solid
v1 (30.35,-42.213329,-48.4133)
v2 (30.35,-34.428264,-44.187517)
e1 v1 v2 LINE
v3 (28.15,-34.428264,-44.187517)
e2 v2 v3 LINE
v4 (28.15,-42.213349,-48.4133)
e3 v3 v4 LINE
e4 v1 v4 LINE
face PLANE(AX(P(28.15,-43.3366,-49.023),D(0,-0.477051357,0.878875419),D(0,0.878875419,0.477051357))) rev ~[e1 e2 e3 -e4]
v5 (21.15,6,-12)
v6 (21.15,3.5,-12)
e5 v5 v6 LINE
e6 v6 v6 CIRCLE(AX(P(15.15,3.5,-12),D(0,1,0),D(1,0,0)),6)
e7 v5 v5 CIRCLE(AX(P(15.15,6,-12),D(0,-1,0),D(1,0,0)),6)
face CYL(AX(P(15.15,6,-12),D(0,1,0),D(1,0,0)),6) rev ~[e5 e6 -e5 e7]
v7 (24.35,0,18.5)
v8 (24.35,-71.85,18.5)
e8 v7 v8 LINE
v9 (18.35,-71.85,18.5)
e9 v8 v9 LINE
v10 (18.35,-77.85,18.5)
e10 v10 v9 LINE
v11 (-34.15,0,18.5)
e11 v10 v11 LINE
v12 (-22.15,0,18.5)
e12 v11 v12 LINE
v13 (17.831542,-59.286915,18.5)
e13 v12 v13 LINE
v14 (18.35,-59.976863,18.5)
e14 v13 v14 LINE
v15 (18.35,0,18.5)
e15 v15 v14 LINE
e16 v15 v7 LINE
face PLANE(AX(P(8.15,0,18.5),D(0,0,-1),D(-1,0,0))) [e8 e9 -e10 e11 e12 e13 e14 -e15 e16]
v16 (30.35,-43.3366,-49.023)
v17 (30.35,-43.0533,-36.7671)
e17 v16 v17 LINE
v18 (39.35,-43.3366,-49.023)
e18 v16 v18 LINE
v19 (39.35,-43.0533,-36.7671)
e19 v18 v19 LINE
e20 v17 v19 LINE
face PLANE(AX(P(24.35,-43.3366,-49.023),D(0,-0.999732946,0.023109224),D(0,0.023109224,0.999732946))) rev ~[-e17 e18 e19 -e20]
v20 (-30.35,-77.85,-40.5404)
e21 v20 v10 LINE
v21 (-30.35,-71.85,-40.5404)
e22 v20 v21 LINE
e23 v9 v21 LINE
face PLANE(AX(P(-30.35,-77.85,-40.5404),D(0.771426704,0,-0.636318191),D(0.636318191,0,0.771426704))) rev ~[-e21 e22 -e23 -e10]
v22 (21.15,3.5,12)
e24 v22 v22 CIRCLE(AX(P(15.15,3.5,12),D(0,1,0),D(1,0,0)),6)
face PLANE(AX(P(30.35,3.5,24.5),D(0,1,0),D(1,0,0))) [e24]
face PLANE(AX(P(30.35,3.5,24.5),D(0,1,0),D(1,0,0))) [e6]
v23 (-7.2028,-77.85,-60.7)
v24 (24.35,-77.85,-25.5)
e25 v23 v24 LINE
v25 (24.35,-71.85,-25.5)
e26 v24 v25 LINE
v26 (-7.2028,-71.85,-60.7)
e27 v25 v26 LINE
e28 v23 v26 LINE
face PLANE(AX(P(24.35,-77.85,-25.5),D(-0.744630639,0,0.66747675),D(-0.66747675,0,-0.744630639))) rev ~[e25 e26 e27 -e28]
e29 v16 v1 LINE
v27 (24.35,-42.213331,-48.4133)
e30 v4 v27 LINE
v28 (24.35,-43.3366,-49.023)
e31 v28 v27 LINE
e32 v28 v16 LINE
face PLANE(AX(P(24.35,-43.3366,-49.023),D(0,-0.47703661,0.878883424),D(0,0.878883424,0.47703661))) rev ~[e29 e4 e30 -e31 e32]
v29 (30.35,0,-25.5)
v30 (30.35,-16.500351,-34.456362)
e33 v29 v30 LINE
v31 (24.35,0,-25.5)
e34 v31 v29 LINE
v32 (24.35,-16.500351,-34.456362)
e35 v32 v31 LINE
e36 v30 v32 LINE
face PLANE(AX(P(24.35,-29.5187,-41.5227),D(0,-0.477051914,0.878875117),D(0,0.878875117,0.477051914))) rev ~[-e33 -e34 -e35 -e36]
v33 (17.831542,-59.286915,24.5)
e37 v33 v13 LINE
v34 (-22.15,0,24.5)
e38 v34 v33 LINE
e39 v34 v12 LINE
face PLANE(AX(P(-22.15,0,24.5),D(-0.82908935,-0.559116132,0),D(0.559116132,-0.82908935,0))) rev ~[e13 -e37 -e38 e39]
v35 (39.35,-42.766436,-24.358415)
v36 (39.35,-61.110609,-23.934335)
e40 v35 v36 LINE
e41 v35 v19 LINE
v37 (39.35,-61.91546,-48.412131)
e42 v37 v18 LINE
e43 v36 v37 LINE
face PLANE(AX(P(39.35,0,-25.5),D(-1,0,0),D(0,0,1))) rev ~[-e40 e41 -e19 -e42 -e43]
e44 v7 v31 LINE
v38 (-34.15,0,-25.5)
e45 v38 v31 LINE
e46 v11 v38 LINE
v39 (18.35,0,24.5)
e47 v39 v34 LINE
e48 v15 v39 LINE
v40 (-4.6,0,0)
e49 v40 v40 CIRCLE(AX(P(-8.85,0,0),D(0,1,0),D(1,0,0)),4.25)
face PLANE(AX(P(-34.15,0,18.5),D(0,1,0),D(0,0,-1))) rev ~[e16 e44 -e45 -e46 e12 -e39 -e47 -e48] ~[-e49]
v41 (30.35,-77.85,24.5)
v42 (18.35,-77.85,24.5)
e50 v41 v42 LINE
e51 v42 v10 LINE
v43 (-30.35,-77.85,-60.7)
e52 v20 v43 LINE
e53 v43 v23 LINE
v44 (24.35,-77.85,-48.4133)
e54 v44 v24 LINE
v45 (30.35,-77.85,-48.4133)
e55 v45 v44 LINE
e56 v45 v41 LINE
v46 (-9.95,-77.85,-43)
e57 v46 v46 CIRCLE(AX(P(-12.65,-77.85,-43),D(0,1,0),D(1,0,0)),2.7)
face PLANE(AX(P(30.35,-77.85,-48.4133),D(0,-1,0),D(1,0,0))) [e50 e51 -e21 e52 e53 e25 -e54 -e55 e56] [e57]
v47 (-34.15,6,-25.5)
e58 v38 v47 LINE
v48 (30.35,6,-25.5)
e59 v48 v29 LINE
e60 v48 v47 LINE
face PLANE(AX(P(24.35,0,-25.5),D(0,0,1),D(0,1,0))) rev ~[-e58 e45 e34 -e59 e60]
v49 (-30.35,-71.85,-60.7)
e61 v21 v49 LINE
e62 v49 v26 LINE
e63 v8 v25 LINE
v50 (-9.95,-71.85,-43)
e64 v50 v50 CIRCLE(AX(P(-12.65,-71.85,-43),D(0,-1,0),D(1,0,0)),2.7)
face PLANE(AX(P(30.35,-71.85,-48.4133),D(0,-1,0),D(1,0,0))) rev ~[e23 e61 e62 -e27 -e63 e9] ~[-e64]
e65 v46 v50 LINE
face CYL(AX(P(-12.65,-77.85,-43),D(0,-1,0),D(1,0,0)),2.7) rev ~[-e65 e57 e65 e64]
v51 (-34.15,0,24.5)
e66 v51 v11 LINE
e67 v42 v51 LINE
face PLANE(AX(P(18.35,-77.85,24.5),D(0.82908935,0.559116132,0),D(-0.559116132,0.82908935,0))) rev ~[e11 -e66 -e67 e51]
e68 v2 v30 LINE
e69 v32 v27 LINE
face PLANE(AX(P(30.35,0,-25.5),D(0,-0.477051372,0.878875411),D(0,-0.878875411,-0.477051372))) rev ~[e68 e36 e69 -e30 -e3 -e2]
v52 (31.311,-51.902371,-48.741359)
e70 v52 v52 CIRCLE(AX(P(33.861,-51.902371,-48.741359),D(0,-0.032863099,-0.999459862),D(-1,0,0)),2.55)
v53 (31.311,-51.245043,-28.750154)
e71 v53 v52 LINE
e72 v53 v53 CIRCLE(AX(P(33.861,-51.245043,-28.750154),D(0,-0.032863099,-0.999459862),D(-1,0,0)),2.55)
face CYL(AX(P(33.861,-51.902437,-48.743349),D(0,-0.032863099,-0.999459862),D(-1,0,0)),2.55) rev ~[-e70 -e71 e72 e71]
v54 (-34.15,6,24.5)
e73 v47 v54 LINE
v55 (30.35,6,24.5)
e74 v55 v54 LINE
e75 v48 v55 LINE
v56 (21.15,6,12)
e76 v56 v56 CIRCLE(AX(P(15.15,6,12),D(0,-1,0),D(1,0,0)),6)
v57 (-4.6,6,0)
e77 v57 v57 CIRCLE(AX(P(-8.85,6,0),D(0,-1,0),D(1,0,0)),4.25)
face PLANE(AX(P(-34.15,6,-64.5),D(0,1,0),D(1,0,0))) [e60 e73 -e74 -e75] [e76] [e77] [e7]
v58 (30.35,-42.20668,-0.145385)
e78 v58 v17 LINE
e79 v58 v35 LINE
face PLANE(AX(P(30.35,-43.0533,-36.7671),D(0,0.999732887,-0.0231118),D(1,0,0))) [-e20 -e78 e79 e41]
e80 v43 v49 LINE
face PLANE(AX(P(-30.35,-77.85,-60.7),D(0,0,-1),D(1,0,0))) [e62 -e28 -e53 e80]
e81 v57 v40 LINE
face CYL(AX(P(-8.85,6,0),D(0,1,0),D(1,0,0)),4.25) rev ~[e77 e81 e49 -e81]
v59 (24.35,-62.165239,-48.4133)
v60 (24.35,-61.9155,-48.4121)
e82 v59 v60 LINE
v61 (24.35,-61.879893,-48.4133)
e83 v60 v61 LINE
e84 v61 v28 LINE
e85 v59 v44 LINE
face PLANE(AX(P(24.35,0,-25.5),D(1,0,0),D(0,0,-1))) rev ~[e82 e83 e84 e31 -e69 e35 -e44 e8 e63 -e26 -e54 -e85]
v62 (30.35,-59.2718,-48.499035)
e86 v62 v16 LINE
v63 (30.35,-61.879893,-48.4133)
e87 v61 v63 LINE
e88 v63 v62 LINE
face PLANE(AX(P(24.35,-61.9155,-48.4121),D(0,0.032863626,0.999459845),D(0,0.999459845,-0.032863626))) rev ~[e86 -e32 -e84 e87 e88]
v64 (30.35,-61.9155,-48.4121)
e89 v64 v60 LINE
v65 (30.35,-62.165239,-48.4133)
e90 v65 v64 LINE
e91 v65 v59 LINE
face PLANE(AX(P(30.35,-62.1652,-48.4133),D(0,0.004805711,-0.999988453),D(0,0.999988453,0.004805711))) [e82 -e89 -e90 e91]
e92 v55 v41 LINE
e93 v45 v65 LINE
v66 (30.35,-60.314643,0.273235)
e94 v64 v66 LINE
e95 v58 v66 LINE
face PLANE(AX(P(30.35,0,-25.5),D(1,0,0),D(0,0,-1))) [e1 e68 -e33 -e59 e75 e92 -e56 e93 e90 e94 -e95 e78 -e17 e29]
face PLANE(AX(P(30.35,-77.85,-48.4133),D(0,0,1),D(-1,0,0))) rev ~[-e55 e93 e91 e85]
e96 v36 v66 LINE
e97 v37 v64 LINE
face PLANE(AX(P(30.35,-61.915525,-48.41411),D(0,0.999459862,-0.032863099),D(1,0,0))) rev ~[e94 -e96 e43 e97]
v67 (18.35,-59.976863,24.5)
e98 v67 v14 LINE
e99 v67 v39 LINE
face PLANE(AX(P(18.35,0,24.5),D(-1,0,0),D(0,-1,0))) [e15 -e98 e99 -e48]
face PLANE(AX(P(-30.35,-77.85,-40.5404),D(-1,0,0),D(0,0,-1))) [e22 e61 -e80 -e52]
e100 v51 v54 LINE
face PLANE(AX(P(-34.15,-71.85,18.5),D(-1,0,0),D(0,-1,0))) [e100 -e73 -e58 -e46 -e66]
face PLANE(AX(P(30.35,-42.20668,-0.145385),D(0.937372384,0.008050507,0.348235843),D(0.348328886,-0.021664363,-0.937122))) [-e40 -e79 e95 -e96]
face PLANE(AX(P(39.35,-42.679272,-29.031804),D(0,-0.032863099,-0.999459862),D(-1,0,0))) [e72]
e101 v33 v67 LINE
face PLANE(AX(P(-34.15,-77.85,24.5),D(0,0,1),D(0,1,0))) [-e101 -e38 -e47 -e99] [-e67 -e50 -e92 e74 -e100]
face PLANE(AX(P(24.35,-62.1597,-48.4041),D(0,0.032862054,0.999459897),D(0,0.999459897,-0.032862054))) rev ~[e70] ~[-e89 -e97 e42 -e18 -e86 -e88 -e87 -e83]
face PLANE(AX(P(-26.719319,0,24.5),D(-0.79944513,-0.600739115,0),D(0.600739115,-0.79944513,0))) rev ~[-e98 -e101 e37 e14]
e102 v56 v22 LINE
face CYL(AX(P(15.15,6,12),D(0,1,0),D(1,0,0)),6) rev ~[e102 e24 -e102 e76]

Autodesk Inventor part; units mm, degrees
ref_plane "YZ Plane" through (0, 0, 0) normal (1, 0, 0) x (0, 1, 0)
ref_plane "XZ Plane" through (0, 0, 0) normal (0, 1, 0) x (-1, 0, 0)
ref_plane "XY Plane" through (0, 0, 0) normal (0, 0, 1) x (1, 0, 0)
sketch "Sketch1" plane through (0, 0, 0) normal (0, 1, 0) x (-1, 0, 0)
  line L0 (0, -25.5) -> (-34.15, -25.5)
  line L1 (-34.15, -25.5) -> (-34.15, 0)
  line L2 (-34.15, 0) -> (-34.15, 25.5)
  line L3 (-34.15, 25.5) -> (0, 25.5)
  line L4 (0, 25.5) -> (34.15, 25.5)
  line L5 (34.15, 25.5) -> (34.15, 0)
  line L6 (34.15, 0) -> (34.15, -25.5)
  line L7 (34.15, -25.5) -> (0, -25.5)
  point P0 (0, 0)
extrude "Extrusion1" add sketch "Sketch1" along normal blind 7
sketch "Sketch3" plane through (-34.15, 0, 25.5) normal (0, 0, 1) x (1, 0, 0)
  line L0 (0, 0) -> (0, -78.85)
  point P0 (34.15, 0)
  dimension "d7" = 78.85
sketch "Sketch4" plane through (-34.15, 0, -25.5) normal (-1, 0, 0) x (0, 0, 1)
  line L0 (51, 0) -> (51, -78.85)
  line L1 (51, -78.85) -> (-39, -78.85)
  line L2 (-39, -78.85) -> (-39, -71.85)
  line L3 (0, 0) -> (-39, -71.85)
  line L4 (0, 0) -> (51, 0)
  point P0 (25.5, 0)
  dimension "d10" = 90
  dimension "d11" = 7
extrude "Extrusion2" add sketch "Sketch4" against normal blind 7
sketch "Sketch7" plane through (-27.15, 0, -25.5) normal (1, 0, 0) x (0, 0, -1)
  line L0 (-51, -78.85) -> (39, -78.85) projected
  line L1 (-51, -78.85) -> (39, -78.85)
  line L2 (39, -78.85) -> (39, -71.85) projected
  line L3 (39, -78.85) -> (39, -71.85)
  line L4 (39, -71.85) -> (-51, -71.85)
  line L5 (-51, 0) -> (-51, -78.85) projected
  line L6 (-51, -78.85) -> (-51, -71.85)
  point P0 (-25.5, 0)
sketch "Sketch8" plane through (0, 0, 0) normal (0, -1, 0) x (1, 0, 0)
  circle A0 centre (8.15, 0) radius 5 projected
  line L0 (8.15, 18.5) -> (34.15, 18.5)
  line L1 (34.15, 25.5) -> (34.15, -25.5) projected
  line L2 (8.15, 25.5) -> (34.15, 25.5)
  line L3 (8.15, 25.5) -> (-27.15, 25.5)
  line L4 (-27.15, 25.5) -> (-27.15, -25.5) projected
  line L5 (8.15, 18.5) -> (-27.15, 18.5)
  line L6 (34.15, 25.5) -> (34.15, 18.5)
  line L7 (-27.15, 25.5) -> (-27.15, 18.5)
  point P0 (0, 0)
extrude "Extrusion6" add sketch "Sketch7" along normal blind 58.5
extrude "Extrusion7" add sketch "Sketch8" along normal blind 78.75 contours L5 L4 L3 L2 L1 L0
sketch "Sketch9" plane through (31.35, 0, -25.5) normal (1, 0, 0) x (0, 0, -1)
  line L0 (-51, -78.75) -> (-51, 7) projected
  line L1 (-44, 0) -> (-44, -71.85) projected
  line L2 (-51, -78.75) -> (-44, -78.75)
  line L3 (-44, -78.75) -> (-44, -71.85)
  line L4 (-44, -71.85) -> (-51, -71.85)
  line L5 (-51, -71.85) -> (-51, -78.75)
  point P0 (-25.5, 0)
extrude "Extrusion8" cut sketch "Sketch9" along normal blind 10
sketch "Sketch10" plane through (0, 7, 0) normal (0, 1, 0) x (1, 0, 0)
  point P0 (0, 0)
sketch "Boceto11" plane through (-34.15, -78.85, -64.5) normal (0, -1, 0) x (1, 0, 0)
  line L0 (0, 0) -> (65.5, 0) projected
  line L1 (65.5, 89.9985) -> (65.5, 0)
  line L2 (65.5, 0) -> (71.065, 0)
  line L3 (71.065, 0) -> (71.065, 89.9985)
  line L4 (71.065, 89.9985) -> (65.5, 89.9985)
  line L5 (65.5, 89.9985) -> (65.5, 95.8996)
  line L6 (65.5, 95.8996) -> (71.065, 89.9985)
  point P0 (34.15, 64.5)
extrude "Extrusión9" cut sketch "Boceto11" against normal blind 100
sketch "Boceto12" plane through (31.35, 0, -25.5) normal (1, 0, 0) x (0, 0, -1)
  line L0 (-44, 0) -> (-44, -71.85) projected
  line L1 (-44, 0) -> (-44, -71.85)
  line L2 (39, -71.85) -> (39, -78.85) projected
  line L3 (-44, -71.85) -> (39, -71.85)
  line L4 (-44, 0) -> (0, 0) projected
  line L5 (39, -71.85) -> (0, 0)
  line L6 (0, 0) -> (-44, 0)
  point P0 (-25.5, 0)
extrude "Extrusión10" add sketch "Boceto12" against normal blind 7
sketch "Boceto13" plane through (-34.15, 7, -25.5) normal (-1, 0, 0) x (0, 0, 1)
  line L0 (0, -7) -> (0, 0) projected
  line L1 (44, -7) -> (0, -7) projected
  line L2 (0, -7) -> (44, -7)
  line L3 (44, -78.85) -> (-39, -78.85) projected
  line L4 (44, -7) -> (44, -78.85)
  line L5 (44, -78.85) -> (-39, -78.85)
  line L6 (-39, -78.85) -> (0, -7)
  point P0 (25.5, -7)
extrude "Extrusión11" cut sketch "Boceto13" against normal blind 7
sketch "Boceto15" plane through (-34.15, 0, -25.5) normal (0, 0, -1) x (-1, 0, 0)
  point P0 (-34.15, 0)
sketch "Boceto19" plane through (-34.15, -78.85, -64.5) normal (0, -1, 0) x (1, 0, 0)
  line L0 (65.5, 90) -> (65.5, 0) projected
  line L1 (65.5, 0) -> (65.5, 40.9323)
  line L2 (81.7334, 40.9323) -> (65.5, 40.9323)
  line L3 (81.7334, 40.9323) -> (81.7334, 0)
  line L4 (81.7334, 0) -> (65.5, 0)
  point P0 (34.15, 64.5)
extrude "Extrusión17" cut sketch "Boceto19" against normal blind 100
sketch "Boceto20" plane through (24.35, 0, -25.5) normal (-1, 0, 0) x (0, 0, 1)
  line L0 (-29.1839, -53.7657) -> (-27.9516, -53.3206) projected
  line L1 (0, 0) -> (-39, -71.85) projected
  line L2 (-29.1839, -53.7657) -> (-27.8697, -51.3447)
  line L3 (-27.8697, -51.3447) -> (-27.9516, -53.3206) projected
  line L4 (-27.8697, -51.3447) -> (-27.9516, -53.3206)
  line L5 (-27.9516, -53.3206) -> (-29.1839, -53.7657)
  point P0 (25.5, 0)
extrude "Extrusión18" add sketch "Boceto20" against normal blind 7
sketch "Boceto21" plane through (24.35, 0, -25.5) normal (-1, 0, 0) x (0, 0, 1)
  point P0 (25.5, 0)
sketch "Boceto22" plane through (24.35, 0, -25.5) normal (-1, 0, 0) x (0, 0, 1)
  point P0 (25.5, 0)
sketch "Boceto24" plane through (31.35, 0, -25.5) normal (1, 0, 0) x (0, 0, -1)
  point P0 (-25.5, 0)
sketch "Boceto26" plane through (24.35, 0, -25.5) normal (-1, 0, 0) x (0, 0, 1)
  point P0 (25.5, 0)
sketch "Boceto27" plane through (31.35, 0, -25.5) normal (1, 0, 0) x (0, 0, -1)
  line L0 (-51, 7) -> (0, 7) projected
  line L1 (0, 7) -> (16.0227, 7)
  line L2 (16.0227, 7) -> (16.0227, -29.5187)
  line L3 (0, 0) -> (39, -71.85) projected
  line L4 (16.0227, -29.5187) -> (0, 0)
  line L5 (0, 0) -> (0, 7)
  point P0 (-25.5, 0)
extrude "Extrusión22" add sketch "Boceto27" against normal blind 7
sketch "Boceto28" plane through (24.35, 0, -25.5) normal (-1, 0, 0) x (0, 0, 1)
  line L0 (-16.0227, -29.5187) -> (-39, -71.85) projected
  line L1 (-16.0227, -29.5187) -> (0, 0)
  line L2 (0, 7) -> (-16.0227, 7) projected
  line L3 (0, 0) -> (0, 7)
  line L4 (0, 7) -> (-16.0227, 7)
  line L5 (-16.0227, 7) -> (-16.0227, -29.5187) projected
  line L6 (-16.0227, 7) -> (-16.0227, -29.5187)
  point P0 (25.5, 0)
extrude "Extrusión23" cut sketch "Boceto28" against normal blind 7
sketch "Boceto29" plane through (31.35, 0, -25.5) normal (1, 0, 0) x (0, 0, -1)
  point P0 (-25.5, 0)
sketch "Boceto31" plane through (-34.15, -78.85, -64.5) normal (0, 0, -1) x (-1, 0, 0)
  line L0 (0, 7) -> (0, 0) projected
  line L1 (0, 0) -> (0, 1)
  line L2 (0, 1) -> (-65.5, 1)
  line L3 (-65.5, 0) -> (-65.5, 85.85) projected
  line L4 (-65.5, 1) -> (-64.5, 1)
  line L5 (-64.5, 1) -> (-64.5, 85.85)
  line L6 (0, 85.85) -> (-65.5, 85.85) projected
  line L7 (-64.5, 85.85) -> (0, 85.85)
  line L8 (0, 85.85) -> (0, 84.85)
  line L9 (0, 0) -> (0, 85.85) projected
  line L10 (0, 84.85) -> (-64.5, 84.85)
  line L11 (-64.5, 85.85) -> (-65.5, 85.85)
  line L12 (0, 0) -> (-65.5, 0) projected
  line L13 (-65.5, 85.85) -> (-65.5, 0)
  line L14 (-65.5, 0) -> (0, 0)
  point P0 (-34.15, 78.85)
  dimension "d84" = 1
  dimension "d85" = 1
  dimension "d86" = 1
extrude "Extrusión26" cut sketch "Boceto31" against normal blind 1000 contours L0 L12 L3 L2 | L10 L5 L6 L8 | L2 L3 L6 L5
sketch "Boceto32" plane through (-34.15, -71.85, 18.5) normal (-1, 0, 0) x (0, 0, 1)
  line L0 (-83, -6) -> (7, -6) projected
  line L1 (7, -6) -> (6, -6)
  line L2 (6, -6) -> (6, 77.85)
  line L3 (7, 77.85) -> (-44, 77.85) projected
  line L4 (7, -6) -> (7, 77.85) projected
  line L5 (6, 77.85) -> (7, 77.85)
  line L6 (7, 77.85) -> (7, -6)
  point P0 (-18.5, 71.85)
  dimension "d89" = 1
extrude "Extrusión27" cut sketch "Boceto32" against normal blind 100
sketch "Boceto33" plane through (-34.15, 6, -25.5) normal (0, 1, 0) x (1, 0, 0)
  line L0 (0, 0) -> (0, -44) projected
  line L1 (0, 0) -> (0, -25.5)
  line L2 (0, -25.5) -> (25.3, -25.5)
  circle A0 centre (25.3, -25.5) radius 4.25
  point P0 (34.15, -25.5)
  dimension "d92" = 25.5
  dimension "d93" = 25.3
  dimension "d94" = 8.5
extrude "Extrusión28" cut sketch "Boceto33" against normal blind 10
sketch "Boceto34" plane through (30.35, -77.85, -64.5) normal (1, 0, 0) x (0, 0, -1)
  point P0 (-64.5, 77.85)
sketch "Boceto35" plane through (30.35, -77.85, -64.5) normal (1, 0, 0) x (0, 0, -1)
  circle A0 centre (-24.4828, 41.285) radius 2.6
  point P0 (-64.5, 77.85)
  dimension "d101" = 5.2
extrude "Extrusión29" cut sketch "Boceto35" against normal blind 10
sketch "Boceto36" plane through (30.35, -77.85, -64.5) normal (1, 0, 0) x (0, 0, -1)
  point P0 (-64.5, 77.85)
sketch "Boceto37" plane through (30.35, -77.85, -64.5) normal (1, 0, 0) x (0, 0, -1)
  line L0 (-39, 77.85) -> (0, 6) projected
  line L1 (-12.3437, 28.741) -> (-12.3437, 48.1268)
  line L2 (-12.3437, 48.1268) -> (-28.4038, 58.3285)
  line L3 (-12.3437, 28.741) -> (-28.4038, 58.3285)
  point P0 (-64.5, 77.85)
extrude "Extrusión30" add sketch "Boceto37" against normal blind 6
fillet "Empalme3" radius 10 3 edges at (27.35, -29.7232, -52.1563) (27.35, -49.109, -52.1563) (27.35, -19.5215, -36.0962)
sketch "Boceto38" plane through (30.35, -77.85, -64.5) normal (1, 0, 0) x (0, 0, -1)
  point P0 (-64.5, 77.85)
sketch "Boceto39" plane through (30.35, -77.85, -64.5) normal (1, 0, 0) x (0, 0, -1)
  line L0 (-6.8274, 18.5782) -> (-18.8698, 18.5782)
  line L1 (-18.8698, 18.5782) -> (-18.2969, 35.7502)
  line L2 (-18.2969, 35.7502) -> (-20.685, 39.2299)
  line L3 (-20.685, 39.2299) -> (-19.4909, 52.6668)
  line L4 (-26.2143, 56.9377) -> (-16.9818, 51.073) projected
  line L5 (-6.8274, 18.5782) -> (-5.5662, 48.0514)
  line L6 (-5.5662, 48.0514) -> (-19.4909, 52.6668)
  point P0 (-64.5, 77.85)
extrude "Extrusión31" cut sketch "Boceto39" against normal blind 2.2
fillet "Empalme4" radius 10 1 edges at (29.25, -25.1832, -45.0091)
sketch "Boceto40" plane through (24.35, 0, -25.5) normal (-1, 0, 0) x (0, 0, 1)
  line L0 (-26.6563, -35.218) -> (-26.6563, -46.57) projected
  line L1 (-26.6563, -35.218) -> (-24.0221, -30.4862) construction
  arc A0 (-12.7857, -20.9123) -> (-9.3588, -17.2419) centre (-18.1476, -12.4713) ccw projected
  line L2 (-24.0221, -30.4862) -> (-10.7107, -19.1566) construction
  spline S0 degree 2 poles (-26.6563, -35.218) (-24.0221, -30.4862) (-10.7107, -19.1566) knots 1 1 1 2 2 2
  line L3 (-26.6563, -35.218) -> (-10.7107, -35.218)
  line L4 (-10.7107, -35.218) -> (-10.7107, -19.1566)
  line L5 (-10.7107, -19.1566) -> (-26.6563, -19.1566)
  line L6 (-26.6563, -19.1566) -> (-26.6563, -35.218)
  point P0 (25.5, 0)
  point P1 (-10.7107, -19.1566)
extrude "Extrusión32" cut sketch "Boceto40" against normal blind 6 contours S0 L6 L5
fillet "Empalme5" radius 10 1 edges at (26.25, -35.218, -52.1563)
sketch "Boceto41" plane through (-34.15, -71.85, 18.5) normal (0, 1, 0) x (1, 0, 0)
  circle A0 centre (11.5, 71.5) radius 5 projected
  circle A1 centre (11.5, 71.5) radius 6
  line L0 (11.5, 71.5) -> (-12.5, 71.5)
  line L1 (-12.5, 71.5) -> (-12.5, 95.5)
  line L2 (-12.5, 95.5) -> (11.5, 95.5)
  line L3 (11.5, 95.5) -> (11.5, 71.5)
  line L4 (64.5, 76.1726) -> (64.5, 83) projected
  line L5 (64.5, 83) -> (64.5, 95.5)
  line L6 (64.5, 95.5) -> (11.5, 95.5)
  line L7 (0, 83) -> (0, -6) projected
  line L8 (0, -6) -> (-12.5, -6)
  line L9 (-12.5, -6) -> (-12.5, 71.5)
  line L10 (64.5, 83) -> (11.5, 83)
  line L11 (0, 83) -> (58.5, 83) projected
  point P0 (34.15, 18.5)
  dimension "d113" = 12
  dimension "d114" = 24
  dimension "d115" = 24
extrude "Extrusión33" add sketch "Boceto41" against normal blind 6 contours L11 L7 L0 L1 L2 L3 | L3 L6 L5 L10 | L7 L8 L9 L0
sketch "Boceto43" plane through (30.35, 6, 24.5) normal (0, 1, 0) x (1, 0, 0)
  circle A0 centre (-39.2, 24.5) radius 4.25 projected
  line L0 (-39.2, 24.5) -> (-15.2, 24.5)
  line L1 (-15.2, 24.5) -> (-15.2, 12.5)
  line L2 (-15.2, 12.5) -> (-15.2, 36.5)
  circle A1 centre (-15.2, 36.5) radius 6
  circle A2 centre (-15.2, 12.5) radius 6
  point P0 (-30.35, 24.5)
  dimension "d123" = 24
  dimension "d124" = 12
  dimension "d125" = 24
  dimension "d126" = 12
  dimension "d127" = 12
extrude "Extrusión35" cut sketch "Boceto43" against normal blind 2.5 contours A1 | A2
sketch "Boceto44" plane through (24.35, 0, -25.5) normal (-1, 0, 0) x (0, 0, 1)
  line L0 (0, 0) -> (-9.3588, -17.2419) projected
  line L1 (-9.3588, -17.2419) -> (-30.5215, -33.5874)
  line L2 (-30.5215, -33.5874) -> (-30.5215, -56.2301)
  line L3 (-27.8675, -51.3405) -> (-39, -71.85) projected
  arc A0 (-12.666, -20.8351) -> (-9.3588, -17.2419) centre (-18.1476, -12.4713) ccw projected
  line L4 (-30.5215, -56.2301) -> (-9.3588, -17.2419)
  point P0 (25.5, 0)
extrude "Extrusión36" add sketch "Boceto44" against normal blind 6
sketch "Boceto45" plane through (30.35, 0, -25.5) normal (1, 0, 0) x (0, 0, -1)
  line L0 (18.315, -38.6201) -> (18.6875, -34.4282) projected
  line L1 (18.6875, -34.4282) -> (19.9402, -25.4146)
  line L2 (9.3588, -17.2419) -> (30.5215, -33.5874) projected
  line L3 (30.5215, -56.2301) -> (30.5215, -33.5874) projected
  line L4 (19.9402, -25.4146) -> (30.5215, -33.5874)
  line L5 (30.5215, -33.5874) -> (32.1519, -59.2336)
  line L6 (30.5215, -56.2301) -> (39, -71.85) projected
  line L7 (32.1726, -59.2718) -> (20.1302, -59.2718) projected
  line L8 (32.1726, -59.2718) -> (18.315, -38.6201)
  point P0 (-25.5, 0)
extrude "Extrusión37" cut sketch "Boceto45" against normal blind 2.2 contours L0 L1 L2 L3 L6 L8
fillet "Empalme7" radius 4 3 edges at (26.25, -33.5874, -56.0215) (27.35, -17.2419, -34.8588) (26.25, -56.2301, -56.0215)
sketch "Boceto46" plane through (-34.15, -71.85, 18.5) normal (0, 1, 0) x (1, 0, 0)
  line L0 (-12.5, -6) -> (0, -6) projected
  line L1 (0, -6) -> (0, 95.5)
  line L2 (-12.5, 95.5) -> (64.5, 95.5) projected
  line L3 (0, 95.5) -> (-12.5, 95.5)
  line L4 (-12.5, 95.5) -> (-12.5, -6)
  line L5 (-12.5, -6) -> (0, -6)
  point P0 (34.15, 18.5)
extrude "Extrusión38" cut sketch "Boceto46" against normal blind 10
sketch "Boceto47" plane through (-34.15, -71.85, 18.5) normal (0, 1, 0) x (1, 0, 0)
  line L0 (0, 0) -> (0, -6) projected
  line L1 (0, 95.5) -> (26.5, 95.5)
  line L2 (26.5, 95.5) -> (26.5, 69)
  line L3 (26.5, 69) -> (0, 69)
  line L4 (0, 69) -> (0, 95.5)
  circle A0 centre (26.5, 69) radius 6
  point P0 (34.15, 18.5)
  dimension "d137" = 26.5
  dimension "d138" = 26.5
  dimension "d139" = 12
extrude "Extrusión39" cut sketch "Boceto47" against normal blind 10 contours A0 L3 L2 | L2 L3 A0
sketch "Sketch48" plane through (-34.15, -71.85, 18.5) normal (0, 1, 0) x (1, 0, 0)
  circle A0 centre (26.5, 69) radius 6 projected
  line L0 (29.7126, 74.0675) -> (26.5, 69)
  circle A1 centre (26.5, 69) radius 18
  line L1 (8.5, 69) -> (8.5, 0)
  line L2 (0, 0) -> (58.5, 0) projected
  line L3 (0, 0) -> (8.5, 0)
  line L4 (26.5, 87) -> (64.5, 87)
  line L5 (64.5, 83) -> (64.5, 95.5) projected
  line L6 (0, 0) -> (0, 95.5) projected
  line L7 (64.5, 95.5) -> (0, 95.5)
  line L8 (0, 95.5) -> (0, 0)
  point P0 (34.15, 18.5)
  dimension "d142" = 36
extrude "Extrusion40" cut sketch "Sketch48" against normal blind 10 contours A1 L1 L2 L6 L7 L5 L4
sketch "Sketch49" plane through (24.35, 0, 18.5) normal (0, 0, -1) x (-1, 0, 0)
  line L0 (58.5, -77.85) -> (50, -77.85) projected
  line L1 (58.5, -77.85) -> (50, -77.85)
  line L2 (50, -71.85) -> (0, -71.85) projected
  line L3 (50, -77.85) -> (50, -71.85)
  line L4 (50, -71.85) -> (58.5, -71.85)
  line L5 (58.5, -71.85) -> (58.5, -77.85)
  point P0 (24.35, 0)
extrude "Extrusion41" add sketch "Sketch49" along normal blind 20
fillet "Fillet8" radius 7 1 edges at (-34.15, -74.85, -1.5)
fillet "Fillet9" radius 2 1 edges at (-25.65, -74.85, -1.5)
sketch "Sketch50" plane through (28.15, -77.85, -64.5) normal (1, 0, 0) x (0, 0, -1)
  point P0 (-64.5, 77.85)
sketch "Sketch51" plane through (-34.15, -77.85, 24.5) normal (0, -1, 0) x (1, 0, 0)
  line L0 (64.5, -50) -> (64.5, 0) projected
  line L1 (64.5, 0) -> (-39.5, 0)
  line L2 (-39.5, 0) -> (-39.5, -120)
  line L3 (-39.5, -120) -> (64.5, -120)
  line L4 (64.5, -120) -> (64.5, 0)
  point P0 (34.15, -24.5)
  dimension "d149" = 104
  dimension "d150" = 120
sketch "Sketch52" plane through (30.35, 0, -25.5) normal (1, 0, 0) x (0, 0, -1)
  line L0 (0, 0) -> (-44, 0) projected
  line L1 (32.1726, -59.2718) -> (39, -71.85) projected
  line L2 (0, 0) -> (39, -71.85)
  line L3 (22.9041, -62.1597) -> (23.523, -43.3366)
  line L4 (22.9041, -62.1597) -> (39, -71.85)
  line L5 (39, -71.85) -> (32.1726, -12.8018)
  line L6 (0, 0) -> (0, 6) projected
  line L7 (32.1726, -12.8018) -> (0, 0)
  point P0 (-25.5, 0)
extrude "Extrusion42" cut sketch "Sketch52" against normal blind 10
sketch "Sketch53" plane through (28.15, -77.85, -64.5) normal (1, 0, 0) x (0, 0, -1)
  line L0 (-16.0959, 15.6903) -> (0, 6) projected
  line L1 (-16.001, 18.5782) -> (-15.477, 34.5134) projected
  line L2 (-16.0959, 15.6903) -> (-15.477, 34.5134)
  line L3 (-15.477, 34.5134) -> (-20.7531, 44.2336)
  line L4 (-39, 77.85) -> (-15.477, 34.5134) projected
  line L5 (-20.7531, 44.2336) -> (-21.8828, 18.4708)
  line L6 (-21.8828, 18.4708) -> (-16.0045, 18.4708)
  point P0 (-64.5, 77.85)
extrude "Extrusion43" add sketch "Sketch53" along normal blind 2.2
sketch "Sketch54" plane through (30.35, 0, -25.5) normal (1, 0, 0) x (0, 0, -1)
  circle A0 centre (14.5172, -36.565) radius 2.6 projected
  circle A1 centre (14.5172, -36.565) radius 2.6
  point P0 (-25.5, 0)
extrude "Extrusion44" add sketch "Sketch54" against normal blind 6
sketch "Sketch55" plane through (30.35, 0, -25.5) normal (1, 0, 0) x (0, 0, -1)
  line L0 (39, -71.85) -> (22.9041, -62.1597) projected
  line L1 (22.9041, -62.1597) -> (13.9423, -61.864)
  line L2 (22.9041, -62.1597) -> (23.523, -43.3366) projected
  line L3 (19.528, -36.1291) -> (23.523, -43.3366)
  line L4 (22.9041, -62.1597) -> (23.523, -43.3366)
  line L5 (5.6191, -42.216) -> (13.9423, -61.864)
  line L6 (5.6191, -42.216) -> (19.528, -36.1291)
  point P0 (-25.5, 0)
sketch "Sketch56" plane through (24.35, 0, -25.5) normal (-1, 0, 0) x (0, 0, 1)
  line L0 (-22.9041, -62.1597) -> (-23.523, -43.3366) projected
  line L1 (-23.523, -43.3366) -> (-22.9041, -62.1597)
  line L2 (-22.9041, -62.1597) -> (-10.8346, -61.7628)
  line L3 (-10.8346, -61.7628) -> (-11.7615, -21.6683)
  line L4 (0, 0) -> (-23.523, -43.3366) projected
  line L5 (-23.523, -43.3366) -> (-11.2671, -43.0533)
  line L6 (-23.523, -43.3366) -> (-22.9041, -62.1597)
  line L7 (-22.9041, -62.1597) -> (-10.8346, -61.7628)
  line L8 (-10.8346, -61.7628) -> (-11.2671, -43.0533)
  line L9 (-11.2671, -43.0533) -> (-23.523, -43.3366)
  point P0 (25.5, 0)
extrude "Extrusion45" add sketch "Sketch56" against normal blind 15 contours L0 L5 L3 L2
sketch "Sketch57" plane through (39.35, -43.3366, -49.023) normal (0, -0.0328631, -0.9994599) x (-1, 0, 0)
  line L0 (0.989, -8.5704) -> (9.989, -8.5704)
  line L1 (9, 46.8938) -> (9, -36.911) projected
  circle A0 centre (5.489, -8.5704) radius 2.55
  line L2 (5.489, -8.5704) -> (0.989, -8.5704)
  line L3 (5.489, -8.5704) -> (-0.011, -8.5704)
  point P0 (39.35, 41.7021)
  dimension "d218" = 5.5
  dimension "d219" = 5.1
extrude "Extrusion46" cut sketch "Sketch57" against normal blind 15
sketch "Sketch58" plane through (39.35, 0, -25.5) normal (1, 0, 0) x (0, 0, -1)
  point P0 (-25.5, 0)
sketch "Sketch59" plane through (30.35, -43.0533, -36.7671) normal (0, 0.9997329, -0.0231118) x (1, 0, 0)
  line L0 (9, 0) -> (9, 12.0754) projected
  line L1 (0, 32.5286) -> (0, -60.4465) projected
  line L2 (9, 0) -> (0, 0)
  line L3 (0, 0) -> (0, -12.412)
  line L4 (0, -12.412) -> (9, -12.412)
  line L5 (9, -12.412) -> (9, 0)
  line L6 (0, -12.412) -> (0, -36.6315)
  line L7 (0, -36.6315) -> (9, -12.412)
  point P0 (-30.35, -37.7523)
extrude "Extrusion47" add sketch "Sketch59" against normal blind 18.7159
sketch "Sketch60" plane through (30.35, 0, -25.5) normal (1, 0, 0) x (0, 0, -1)
  line L0 (22.9041, -62.1597) -> (10.8346, -61.7628) projected
  line L1 (22.9041, -62.1597) -> (-35.3443, -60.8131)
  line L2 (10.8346, -61.7642) -> (-25.7871, -60.9175) projected
  line L3 (-35.3443, -60.8131) -> (-11.8971, -71.85)
  line L4 (-44, -71.85) -> (39, -71.85) projected
  line L5 (22.9041, -62.1597) -> (-11.8971, -71.85)
  point P0 (-25.5, 0)
extrude "Extrusion48" cut sketch "Sketch60" along normal blind 18.7159
sketch "Sketch61" plane through (39.35, -43.3366, -49.023) normal (0, -0.0328631, -0.9994599) x (-1, 0, 0)
  point P0 (39.35, 41.7021)
sketch "Sketch62" plane through (39.35, -43.3366, -49.023) normal (0, -0.0328631, -0.9994599) x (-1, 0, 0)
  line L0 (9, -18.8333) -> (9, -18.8346) projected
  line L1 (9, -18.8346) -> (-1.0251, -18.8346)
  line L2 (-1.0251, -18.8346) -> (-1.0251, -24.5564)
  line L3 (-1.0251, -24.5564) -> (9, -24.5564)
  line L4 (9, -24.5564) -> (9, -18.8346)
  point P0 (39.35, 41.7021)
extrude "Extrusion49" cut sketch "Sketch62" against normal blind 100
sketch "Sketch63" plane through (39.35, -43.3366, -49.023) normal (0, -0.0328631, -0.9994599) x (-1, 0, 0)
  line L0 (9, 46.8938) -> (9, -36.911) projected
  line L1 (9, -18.5889) -> (-0.3497, -18.5889)
  line L2 (-0.3497, -18.5889) -> (-0.3497, -22.6635)
  line L3 (-0.3497, -22.6635) -> (9, -22.6635)
  line L4 (9, -22.6635) -> (9, -18.5889)
  point P0 (39.35, 41.7021)
  point P1 (9, -22.6635)
extrude "Extrusion50" cut sketch "Sketch63" against normal blind 100
sketch "Sketch64" plane through (-34.15, 6, -25.5) normal (0, 1, 0) x (1, 0, 0)
  line L0 (58.5, -44) -> (58.5, 39) projected
  line L1 (58.5, 23.5443) -> (58.5, 43.0724)
  line L2 (58.5, 43.0724) -> (64.7623, 43.0724)
  line L3 (64.7623, 43.0724) -> (64.7623, 23.523)
  line L4 (64.5, 23.523) -> (73.5, 23.523) projected
  line L5 (58.5, 23.523) -> (64.5, 23.523) projected
  line L6 (58.5, 23.523) -> (64.7623, 23.523)
  point P0 (34.15, -25.5)
extrude "Extrusion51" cut sketch "Sketch64" against normal blind 100
sketch "Sketch65" plane through (-34.15, 6, -25.5) normal (0, 1, 0) x (1, 0, 0)
  point P0 (34.15, -25.5)
sketch "Sketch66" plane through (-34.15, -77.85, 24.5) normal (0, -1, 0) x (1, 0, 0)
  line L0 (64.5, -73.523) -> (64.5, 0) projected
  line L1 (64.5, -72.9133) -> (58.4721, -72.9133)
  line L2 (58.4721, -72.9133) -> (58.4721, -73.523)
  line L3 (58.4721, -73.523) -> (64.5, -73.523)
  line L4 (64.5, -73.523) -> (64.5, -72.9133)
  point P0 (34.15, -24.5)
extrude "Extrusion52" cut sketch "Sketch66" against normal blind 100
sketch "Sketch67" plane through (24.35, 0, -25.5) normal (-1, 0, 0) x (0, 0, 1)
  line L0 (-22.9121, -61.9155) -> (-23.523, -43.3366) projected
  line L1 (-22.9121, -61.9155) -> (-23.523, -43.3366)
  line L2 (-22.9133, -43.3225) -> (-22.9133, -42.2133) projected
  line L3 (-23.523, -43.3366) -> (-22.9133, -42.2133)
  line L4 (-22.9133, -42.2133) -> (-22.9121, -61.9155)
  point P0 (25.5, 0)
extrude "Extrusion53" add sketch "Sketch67" against normal blind 6
sketch "Sketch68" plane through (24.35, -62.1597, -48.4041) normal (0, 0.8567227, -0.5157773) x (1, 0, 0)
  point P0 (-24.35, -73.5294)
sketch "Sketch69" plane through (30.35, 0, -25.5) normal (1, 0, 0) x (0, 0, -1)
  point P0 (-25.5, 0)
sketch "Sketch70" plane through (30.35, 0, -25.5) normal (1, 0, 0) x (0, 0, -1)
  line L0 (22.9121, -61.9155) -> (23.523, -43.3366) projected
  line L1 (23.523, -43.3366) -> (22.9041, -62.1597) projected
  line L2 (22.9121, -61.9155) -> (22.9041, -62.1597)
  line L3 (22.9041, -62.1597) -> (22.9133, -62.1652)
  line L4 (22.9133, -62.1652) -> (22.9121, -61.9155)
  point P0 (-25.5, 0)
  point P1 (22.9133, -77.85)
extrude "Extrusion54" add sketch "Sketch70" against normal blind 6
sketch "Sketch71" plane through (-34.15, -77.85, 24.5) normal (0, 0, 1) x (1, 0, 0)
  line L0 (0, 0) -> (0, 83.85) projected
  line L1 (0, 83.85) -> (0, 77.85)
  line L2 (64.5, 83.85) -> (64.5, 77.85) projected
  line L3 (0, 83.85) -> (64.5, 83.85)
  line L4 (64.5, 83.85) -> (64.5, 77.85)
  line L5 (64.5, 77.85) -> (0, 77.85)
  line L6 (64.5, 83.85) -> (64.5, 0)
  line L7 (64.5, 0) -> (58.5, 0)
  line L8 (58.5, 0) -> (58.5, 83.85)
  line L9 (0, 77.85) -> (58.5, 0)
  line L10 (58.5, 0) -> (62.7426, 4.2426)
  line L11 (58.5, 0) -> (64.5, 0) construction
  line L12 (0, 77.85) -> (4.2426, 82.0926)
  line L13 (0, 77.85) -> (6, 77.85) construction
  line L14 (4.2426, 82.0926) -> (62.7426, 4.2426)
  line L15 (0, 77.85) -> (0, 0)
  line L16 (58.5, 0) -> (0, 0)
  point P0 (34.15, 77.85)
  point P1 (7.4308, 77.85)
  point P2 (58.5, 9.8886)
  point P3 (58.5, 77.85)
  dimension "d177" = 6
  dimension "d178" = 6
  dimension "d179" = 45
  dimension "d180" = 6
  dimension "d181" = 45
extrude "Extrusion55" cut sketch "Sketch71" against normal blind 6 contours L5 L8 L14
extrude "Extrusion56" cut sketch "Sketch71" against normal blind 6 contours L0 L9 L16
sketch "Sketch72" plane through (-25.65, -77.85, -50.5) normal (0, -1, 0) x (1, 0, 0)
  line L0 (50, -18) -> (50, 1.477) projected
  line L1 (18, -18) -> (50, -18) projected
  line L2 (50, 1.477) -> (18, -18)
  line L3 (50, 75) -> (50, 69) projected
  line L4 (50, 69) -> (0, 0)
  line L5 (0, 0) -> (-27.3378, 0)
  line L6 (0, 47.0139) -> (0, 0) projected
  line L7 (-27.3378, 0) -> (-27.3378, 69)
  line L8 (-27.3378, 69) -> (50, 69)
  line L9 (50, 1.477) -> (75.3518, 1.477)
  line L10 (75.3518, 1.477) -> (75.3518, -41.3346)
  line L11 (75.3518, -41.3346) -> (14.5595, -36.9915)
  line L12 (14.5595, -36.9915) -> (18, -18)
  point P0 (25.65, 50.5)
extrude "Extrusion57" cut sketch "Sketch72" against normal blind 6
fillet "Fillet10" radius 10 2 edges at (-25.65, -74.85, -50.5) (-7.65, -74.85, -68.5)
sketch "Sketch73" plane through (-34.15, 6, 24.5) normal (0, 0, 1) x (1, 0, 0)
  line L0 (0, -5.9793) -> (12, -6)
  line L1 (58.5, -6) -> (0, -6) projected
  line L2 (64.5, -83.85) -> (58.5, -83.85) projected
  line L3 (64.5, -83.85) -> (52.5, -83.85)
  line L4 (29.4334, -83.85) -> (58.5, -83.85) projected
  line L5 (52.5, -83.85) -> (0, -6)
  line L6 (12, -6) -> (64.5, -83.85)
  line L7 (64.5, 0) -> (64.5, -83.85) projected
  line L8 (64.5, 0) -> (52.5, 0)
  line L9 (43.3, 0) -> (55.3, 0) projected
  line L10 (52.5, 0) -> (52.5, -83.85)
  line L11 (64.5, -83.85) -> (64.5, 0)
  point P0 (34.15, -6)
  point P1 (0, -5.9793)
  point P2 (52.5, -66.0557)
  dimension "d189" = 12
  dimension "d190" = 12
  dimension "d191" = 12
extrude "Extrusion58" add sketch "Sketch73" against normal blind 6 contours L6 L10 L5 L1 | L10 L8 L7 L6 | L6 L2 L3 L10
sketch "Sketch74" plane through (24.3221, -77.85, -48.4133) normal (0, -1, 0) x (1, 0, 0)
  line L0 (-5.9721, 66.9133) -> (-5.9721, 72.9133) projected
  arc A0 (-47.6253, 1.1519) -> (-48.9724, -8.0022) centre (-39.5278, -4.7158) ccw projected
  line L1 (-5.9721, 66.9133) -> (-47.6253, 1.1519)
  line L2 (-47.6253, 1.1519) -> (2.7458, 61.3913)
  line L3 (2.7458, 61.3913) -> (2.7458, 69.1583)
  line L4 (2.7458, 69.1583) -> (-5.9721, 66.9133)
  point P0 (-24.3221, 48.4133)
sketch "Sketch75" plane through (24.3221, -77.85, -48.4133) normal (0, -1, 0) x (1, 0, 0)
  line L0 (0.0279, 66.9133) -> (-5.9721, 66.9133) projected
  line L1 (0.0279, 66.9133) -> (-58.6081, 66.9133)
  line L2 (-58.6081, 66.9133) -> (-58.6081, -36.0072)
  line L3 (-58.6081, -36.0072) -> (0.0279, -36.0072)
  line L4 (0.0279, -36.0072) -> (0.0279, 66.9133)
  line L5 (-58.6081, -14.2867) -> (-22.1551, -14.2867)
  line L6 (-22.1551, -14.2867) -> (0.0279, -0.0031)
  line L7 (0.0279, -0.0031) -> (0.0279, 66.9133)
  line L8 (-58.6081, -14.2867) -> (-58.6081, 22.9494)
  line L9 (-58.6081, -14.2867) -> (-22.1551, -14.2867)
  line L10 (-58.6081, 22.1663) -> (-58.6081, -14.2867)
  line L11 (-58.6081, 22.1663) -> (0.0279, 66.9133)
extrude "Extrusion59" add sketch "Sketch75" against normal blind 6 contours L4 L6 L5 L2 L11
extrude "Extrusion60" cut sketch "Sketch75" against normal blind 6 contours L11 L2 L1 L0 | L4 L3 L2 L5 L6
sketch "Sketch76" plane through (30.35, -77.85, -48.4133) normal (0, -1, 0) x (1, 0, 0)
  line L0 (-6, 66.9133) -> (-12, 66.9133) projected
  line L1 (-6, 66.9133) -> (-12, 66.9133)
  line L2 (-64.6359, 22.1663) -> (-6, 66.9133) projected
  line L3 (-12, 66.9133) -> (-64.6359, 22.1663)
  line L4 (-64.6359, 22.1663) -> (-6, 66.9133)
  point P0 (-30.35, 48.4133)
extrude "Extrusion61" add sketch "Sketch76" against normal blind 6
sketch "Sketch77" plane through (30.35, -77.85, -48.4133) normal (0, -1, 0) x (1, 0, 0)
  point P0 (-30.35, 48.4133)
sketch "Sketch78" plane through (30.35, -77.85, -48.4133) normal (0, -1, 0) x (1, 0, 0)
  line L0 (-64.5, 72.9133) -> (-43, 72.9133)
  line L1 (-43, 72.9133) -> (-43, 5.4133)
  line L2 (-43, 5.4133) -> (-64.5, 5.4133)
  line L3 (-64.5, 5.4133) -> (-64.5, 72.9133)
  circle A0 centre (-43, 5.4133) radius 2.7
  point P0 (-30.35, 48.4133)
  dimension "d203" = 21.5
  dimension "d204" = 67.5
  dimension "d205" = 5.4
extrude "Extrusion62" cut sketch "Sketch78" against normal blind 10 contours A0 L2 L1 | L1 L2 A0
sketch "Sketch79" plane through (30.35, -77.85, -48.4133) normal (0, -1, 0) x (1, 0, 0)
  circle A0 centre (-43, 5.4133) radius 2.7 projected
  line L0 (-43, 5.4133) -> (-58, 5.4133)
  line L1 (-58, 5.4133) -> (-58, -9.5867)
  line L2 (-58, -9.5867) -> (-43, -9.5867)
  line L3 (-43, -9.5867) -> (-43, 5.4133)
  line L4 (-6, -0.0031) -> (-28.183, -14.2867) projected
  line L5 (-43, 5.4133) -> (-20.8837, 5.4133)
  line L6 (-20.8837, 5.4133) -> (-20.8837, -9.5867)
  line L7 (-20.8837, -9.5867) -> (-43, -9.5867)
  line L8 (-43, -9.5867) -> (-43, 5.4133)
  line L9 (-43, 5.4133) -> (-58, 5.4133)
  line L10 (-58, 5.4133) -> (-58, 20.4133)
  line L11 (-58, 20.4133) -> (-43, 20.4133)
  line L12 (-43, 20.4133) -> (-43, 5.4133)
  line L13 (-6, 66.9133) -> (-12, 66.9133) projected
  line L14 (-58, 20.4133) -> (-12, 66.9133)
  line L15 (-20.8837, -9.5867) -> (-19.2086, -25.0375)
  line L16 (-19.2086, -25.0375) -> (-82.6089, -27.6328)
  line L17 (-82.6089, -27.6328) -> (-82.6089, 32.6161)
  line L18 (-82.6089, 32.6161) -> (-12, 66.9133)
  point P0 (-30.35, 48.4133)
  dimension "d208" = 15
  dimension "d209" = 15
  dimension "d210" = 15
  dimension "d211" = 15
extrude "Extrusion63" cut sketch "Sketch79" against normal blind 10 contours L7 L15 L16 L17 L18 L14 L10 L1 L2
extrude "Extrusion64" cut sketch "Sketch57" against normal blind 20
sketch "Sketch80" plane through (30.35, -77.85, -48.4133) normal (0, -1, 0) x (1, 0, 0)
  line L0 (-60.7, 7.8729) -> (-60.7, -12.2867)
  line L1 (-60.7, -12.2867) -> (-37.5528, -12.2867)
  line L2 (-6, 24.0093) -> (-6, 66.9133)
  line L3 (-6, 66.9133) -> (-12.2668, 66.9133)
  circle A0 centre (-43, 5.4133) radius 2.7
  circle A1 centre (-43, 5.4133) radius 2.7
  line L4 (-58, 20.4133) -> (-12, 66.9133) projected
  line L5 (-6, 66.9133) -> (-6, 22.9133) projected
  line L6 (-12, 66.9133) -> (-6, 66.9133)
  line L7 (-6, 66.9133) -> (-6, -0.3604)
  circle A2 centre (-43, 5.4133) radius 2.7 projected
  circle A3 centre (-43, 5.4133) radius 2.7
  line L8 (-6, 22.9133) -> (-64.5, 22.9133) projected
  line L9 (-6, 22.9133) -> (-37.5528, -12.2867)
  line L10 (-60.7, 7.8729) -> (-12, 66.9133)
  line L11 (-6, 66.9133) -> (-99.5345, 66.9133)
  line L12 (-99.5345, 66.9133) -> (-99.5345, -44.4669)
  line L13 (-99.5345, -44.4669) -> (-6, -44.4669)
  line L14 (-6, -44.4669) -> (-6, 66.9133)
  point P0 (-19.7017, 74.4527)
  point P1 (-33.15, 48.4133)
  point P2 (-6, 22.9133)
  point P3 (-48.2938, 22.9133)
extrude "Extrusion65" cut sketch "Sketch80" against normal blind 6 contours L0 L1 L9 L7 L14 L13 L12 L11 L3 L4 L8 L10 | L8 L4 L10
extrude "Extrusion66" add sketch "Sketch80" against normal blind 6 contours L10 L8 L9 L1 L0
properties part number "DC23[i3][L][T1]" material "Aluminio 6061"
